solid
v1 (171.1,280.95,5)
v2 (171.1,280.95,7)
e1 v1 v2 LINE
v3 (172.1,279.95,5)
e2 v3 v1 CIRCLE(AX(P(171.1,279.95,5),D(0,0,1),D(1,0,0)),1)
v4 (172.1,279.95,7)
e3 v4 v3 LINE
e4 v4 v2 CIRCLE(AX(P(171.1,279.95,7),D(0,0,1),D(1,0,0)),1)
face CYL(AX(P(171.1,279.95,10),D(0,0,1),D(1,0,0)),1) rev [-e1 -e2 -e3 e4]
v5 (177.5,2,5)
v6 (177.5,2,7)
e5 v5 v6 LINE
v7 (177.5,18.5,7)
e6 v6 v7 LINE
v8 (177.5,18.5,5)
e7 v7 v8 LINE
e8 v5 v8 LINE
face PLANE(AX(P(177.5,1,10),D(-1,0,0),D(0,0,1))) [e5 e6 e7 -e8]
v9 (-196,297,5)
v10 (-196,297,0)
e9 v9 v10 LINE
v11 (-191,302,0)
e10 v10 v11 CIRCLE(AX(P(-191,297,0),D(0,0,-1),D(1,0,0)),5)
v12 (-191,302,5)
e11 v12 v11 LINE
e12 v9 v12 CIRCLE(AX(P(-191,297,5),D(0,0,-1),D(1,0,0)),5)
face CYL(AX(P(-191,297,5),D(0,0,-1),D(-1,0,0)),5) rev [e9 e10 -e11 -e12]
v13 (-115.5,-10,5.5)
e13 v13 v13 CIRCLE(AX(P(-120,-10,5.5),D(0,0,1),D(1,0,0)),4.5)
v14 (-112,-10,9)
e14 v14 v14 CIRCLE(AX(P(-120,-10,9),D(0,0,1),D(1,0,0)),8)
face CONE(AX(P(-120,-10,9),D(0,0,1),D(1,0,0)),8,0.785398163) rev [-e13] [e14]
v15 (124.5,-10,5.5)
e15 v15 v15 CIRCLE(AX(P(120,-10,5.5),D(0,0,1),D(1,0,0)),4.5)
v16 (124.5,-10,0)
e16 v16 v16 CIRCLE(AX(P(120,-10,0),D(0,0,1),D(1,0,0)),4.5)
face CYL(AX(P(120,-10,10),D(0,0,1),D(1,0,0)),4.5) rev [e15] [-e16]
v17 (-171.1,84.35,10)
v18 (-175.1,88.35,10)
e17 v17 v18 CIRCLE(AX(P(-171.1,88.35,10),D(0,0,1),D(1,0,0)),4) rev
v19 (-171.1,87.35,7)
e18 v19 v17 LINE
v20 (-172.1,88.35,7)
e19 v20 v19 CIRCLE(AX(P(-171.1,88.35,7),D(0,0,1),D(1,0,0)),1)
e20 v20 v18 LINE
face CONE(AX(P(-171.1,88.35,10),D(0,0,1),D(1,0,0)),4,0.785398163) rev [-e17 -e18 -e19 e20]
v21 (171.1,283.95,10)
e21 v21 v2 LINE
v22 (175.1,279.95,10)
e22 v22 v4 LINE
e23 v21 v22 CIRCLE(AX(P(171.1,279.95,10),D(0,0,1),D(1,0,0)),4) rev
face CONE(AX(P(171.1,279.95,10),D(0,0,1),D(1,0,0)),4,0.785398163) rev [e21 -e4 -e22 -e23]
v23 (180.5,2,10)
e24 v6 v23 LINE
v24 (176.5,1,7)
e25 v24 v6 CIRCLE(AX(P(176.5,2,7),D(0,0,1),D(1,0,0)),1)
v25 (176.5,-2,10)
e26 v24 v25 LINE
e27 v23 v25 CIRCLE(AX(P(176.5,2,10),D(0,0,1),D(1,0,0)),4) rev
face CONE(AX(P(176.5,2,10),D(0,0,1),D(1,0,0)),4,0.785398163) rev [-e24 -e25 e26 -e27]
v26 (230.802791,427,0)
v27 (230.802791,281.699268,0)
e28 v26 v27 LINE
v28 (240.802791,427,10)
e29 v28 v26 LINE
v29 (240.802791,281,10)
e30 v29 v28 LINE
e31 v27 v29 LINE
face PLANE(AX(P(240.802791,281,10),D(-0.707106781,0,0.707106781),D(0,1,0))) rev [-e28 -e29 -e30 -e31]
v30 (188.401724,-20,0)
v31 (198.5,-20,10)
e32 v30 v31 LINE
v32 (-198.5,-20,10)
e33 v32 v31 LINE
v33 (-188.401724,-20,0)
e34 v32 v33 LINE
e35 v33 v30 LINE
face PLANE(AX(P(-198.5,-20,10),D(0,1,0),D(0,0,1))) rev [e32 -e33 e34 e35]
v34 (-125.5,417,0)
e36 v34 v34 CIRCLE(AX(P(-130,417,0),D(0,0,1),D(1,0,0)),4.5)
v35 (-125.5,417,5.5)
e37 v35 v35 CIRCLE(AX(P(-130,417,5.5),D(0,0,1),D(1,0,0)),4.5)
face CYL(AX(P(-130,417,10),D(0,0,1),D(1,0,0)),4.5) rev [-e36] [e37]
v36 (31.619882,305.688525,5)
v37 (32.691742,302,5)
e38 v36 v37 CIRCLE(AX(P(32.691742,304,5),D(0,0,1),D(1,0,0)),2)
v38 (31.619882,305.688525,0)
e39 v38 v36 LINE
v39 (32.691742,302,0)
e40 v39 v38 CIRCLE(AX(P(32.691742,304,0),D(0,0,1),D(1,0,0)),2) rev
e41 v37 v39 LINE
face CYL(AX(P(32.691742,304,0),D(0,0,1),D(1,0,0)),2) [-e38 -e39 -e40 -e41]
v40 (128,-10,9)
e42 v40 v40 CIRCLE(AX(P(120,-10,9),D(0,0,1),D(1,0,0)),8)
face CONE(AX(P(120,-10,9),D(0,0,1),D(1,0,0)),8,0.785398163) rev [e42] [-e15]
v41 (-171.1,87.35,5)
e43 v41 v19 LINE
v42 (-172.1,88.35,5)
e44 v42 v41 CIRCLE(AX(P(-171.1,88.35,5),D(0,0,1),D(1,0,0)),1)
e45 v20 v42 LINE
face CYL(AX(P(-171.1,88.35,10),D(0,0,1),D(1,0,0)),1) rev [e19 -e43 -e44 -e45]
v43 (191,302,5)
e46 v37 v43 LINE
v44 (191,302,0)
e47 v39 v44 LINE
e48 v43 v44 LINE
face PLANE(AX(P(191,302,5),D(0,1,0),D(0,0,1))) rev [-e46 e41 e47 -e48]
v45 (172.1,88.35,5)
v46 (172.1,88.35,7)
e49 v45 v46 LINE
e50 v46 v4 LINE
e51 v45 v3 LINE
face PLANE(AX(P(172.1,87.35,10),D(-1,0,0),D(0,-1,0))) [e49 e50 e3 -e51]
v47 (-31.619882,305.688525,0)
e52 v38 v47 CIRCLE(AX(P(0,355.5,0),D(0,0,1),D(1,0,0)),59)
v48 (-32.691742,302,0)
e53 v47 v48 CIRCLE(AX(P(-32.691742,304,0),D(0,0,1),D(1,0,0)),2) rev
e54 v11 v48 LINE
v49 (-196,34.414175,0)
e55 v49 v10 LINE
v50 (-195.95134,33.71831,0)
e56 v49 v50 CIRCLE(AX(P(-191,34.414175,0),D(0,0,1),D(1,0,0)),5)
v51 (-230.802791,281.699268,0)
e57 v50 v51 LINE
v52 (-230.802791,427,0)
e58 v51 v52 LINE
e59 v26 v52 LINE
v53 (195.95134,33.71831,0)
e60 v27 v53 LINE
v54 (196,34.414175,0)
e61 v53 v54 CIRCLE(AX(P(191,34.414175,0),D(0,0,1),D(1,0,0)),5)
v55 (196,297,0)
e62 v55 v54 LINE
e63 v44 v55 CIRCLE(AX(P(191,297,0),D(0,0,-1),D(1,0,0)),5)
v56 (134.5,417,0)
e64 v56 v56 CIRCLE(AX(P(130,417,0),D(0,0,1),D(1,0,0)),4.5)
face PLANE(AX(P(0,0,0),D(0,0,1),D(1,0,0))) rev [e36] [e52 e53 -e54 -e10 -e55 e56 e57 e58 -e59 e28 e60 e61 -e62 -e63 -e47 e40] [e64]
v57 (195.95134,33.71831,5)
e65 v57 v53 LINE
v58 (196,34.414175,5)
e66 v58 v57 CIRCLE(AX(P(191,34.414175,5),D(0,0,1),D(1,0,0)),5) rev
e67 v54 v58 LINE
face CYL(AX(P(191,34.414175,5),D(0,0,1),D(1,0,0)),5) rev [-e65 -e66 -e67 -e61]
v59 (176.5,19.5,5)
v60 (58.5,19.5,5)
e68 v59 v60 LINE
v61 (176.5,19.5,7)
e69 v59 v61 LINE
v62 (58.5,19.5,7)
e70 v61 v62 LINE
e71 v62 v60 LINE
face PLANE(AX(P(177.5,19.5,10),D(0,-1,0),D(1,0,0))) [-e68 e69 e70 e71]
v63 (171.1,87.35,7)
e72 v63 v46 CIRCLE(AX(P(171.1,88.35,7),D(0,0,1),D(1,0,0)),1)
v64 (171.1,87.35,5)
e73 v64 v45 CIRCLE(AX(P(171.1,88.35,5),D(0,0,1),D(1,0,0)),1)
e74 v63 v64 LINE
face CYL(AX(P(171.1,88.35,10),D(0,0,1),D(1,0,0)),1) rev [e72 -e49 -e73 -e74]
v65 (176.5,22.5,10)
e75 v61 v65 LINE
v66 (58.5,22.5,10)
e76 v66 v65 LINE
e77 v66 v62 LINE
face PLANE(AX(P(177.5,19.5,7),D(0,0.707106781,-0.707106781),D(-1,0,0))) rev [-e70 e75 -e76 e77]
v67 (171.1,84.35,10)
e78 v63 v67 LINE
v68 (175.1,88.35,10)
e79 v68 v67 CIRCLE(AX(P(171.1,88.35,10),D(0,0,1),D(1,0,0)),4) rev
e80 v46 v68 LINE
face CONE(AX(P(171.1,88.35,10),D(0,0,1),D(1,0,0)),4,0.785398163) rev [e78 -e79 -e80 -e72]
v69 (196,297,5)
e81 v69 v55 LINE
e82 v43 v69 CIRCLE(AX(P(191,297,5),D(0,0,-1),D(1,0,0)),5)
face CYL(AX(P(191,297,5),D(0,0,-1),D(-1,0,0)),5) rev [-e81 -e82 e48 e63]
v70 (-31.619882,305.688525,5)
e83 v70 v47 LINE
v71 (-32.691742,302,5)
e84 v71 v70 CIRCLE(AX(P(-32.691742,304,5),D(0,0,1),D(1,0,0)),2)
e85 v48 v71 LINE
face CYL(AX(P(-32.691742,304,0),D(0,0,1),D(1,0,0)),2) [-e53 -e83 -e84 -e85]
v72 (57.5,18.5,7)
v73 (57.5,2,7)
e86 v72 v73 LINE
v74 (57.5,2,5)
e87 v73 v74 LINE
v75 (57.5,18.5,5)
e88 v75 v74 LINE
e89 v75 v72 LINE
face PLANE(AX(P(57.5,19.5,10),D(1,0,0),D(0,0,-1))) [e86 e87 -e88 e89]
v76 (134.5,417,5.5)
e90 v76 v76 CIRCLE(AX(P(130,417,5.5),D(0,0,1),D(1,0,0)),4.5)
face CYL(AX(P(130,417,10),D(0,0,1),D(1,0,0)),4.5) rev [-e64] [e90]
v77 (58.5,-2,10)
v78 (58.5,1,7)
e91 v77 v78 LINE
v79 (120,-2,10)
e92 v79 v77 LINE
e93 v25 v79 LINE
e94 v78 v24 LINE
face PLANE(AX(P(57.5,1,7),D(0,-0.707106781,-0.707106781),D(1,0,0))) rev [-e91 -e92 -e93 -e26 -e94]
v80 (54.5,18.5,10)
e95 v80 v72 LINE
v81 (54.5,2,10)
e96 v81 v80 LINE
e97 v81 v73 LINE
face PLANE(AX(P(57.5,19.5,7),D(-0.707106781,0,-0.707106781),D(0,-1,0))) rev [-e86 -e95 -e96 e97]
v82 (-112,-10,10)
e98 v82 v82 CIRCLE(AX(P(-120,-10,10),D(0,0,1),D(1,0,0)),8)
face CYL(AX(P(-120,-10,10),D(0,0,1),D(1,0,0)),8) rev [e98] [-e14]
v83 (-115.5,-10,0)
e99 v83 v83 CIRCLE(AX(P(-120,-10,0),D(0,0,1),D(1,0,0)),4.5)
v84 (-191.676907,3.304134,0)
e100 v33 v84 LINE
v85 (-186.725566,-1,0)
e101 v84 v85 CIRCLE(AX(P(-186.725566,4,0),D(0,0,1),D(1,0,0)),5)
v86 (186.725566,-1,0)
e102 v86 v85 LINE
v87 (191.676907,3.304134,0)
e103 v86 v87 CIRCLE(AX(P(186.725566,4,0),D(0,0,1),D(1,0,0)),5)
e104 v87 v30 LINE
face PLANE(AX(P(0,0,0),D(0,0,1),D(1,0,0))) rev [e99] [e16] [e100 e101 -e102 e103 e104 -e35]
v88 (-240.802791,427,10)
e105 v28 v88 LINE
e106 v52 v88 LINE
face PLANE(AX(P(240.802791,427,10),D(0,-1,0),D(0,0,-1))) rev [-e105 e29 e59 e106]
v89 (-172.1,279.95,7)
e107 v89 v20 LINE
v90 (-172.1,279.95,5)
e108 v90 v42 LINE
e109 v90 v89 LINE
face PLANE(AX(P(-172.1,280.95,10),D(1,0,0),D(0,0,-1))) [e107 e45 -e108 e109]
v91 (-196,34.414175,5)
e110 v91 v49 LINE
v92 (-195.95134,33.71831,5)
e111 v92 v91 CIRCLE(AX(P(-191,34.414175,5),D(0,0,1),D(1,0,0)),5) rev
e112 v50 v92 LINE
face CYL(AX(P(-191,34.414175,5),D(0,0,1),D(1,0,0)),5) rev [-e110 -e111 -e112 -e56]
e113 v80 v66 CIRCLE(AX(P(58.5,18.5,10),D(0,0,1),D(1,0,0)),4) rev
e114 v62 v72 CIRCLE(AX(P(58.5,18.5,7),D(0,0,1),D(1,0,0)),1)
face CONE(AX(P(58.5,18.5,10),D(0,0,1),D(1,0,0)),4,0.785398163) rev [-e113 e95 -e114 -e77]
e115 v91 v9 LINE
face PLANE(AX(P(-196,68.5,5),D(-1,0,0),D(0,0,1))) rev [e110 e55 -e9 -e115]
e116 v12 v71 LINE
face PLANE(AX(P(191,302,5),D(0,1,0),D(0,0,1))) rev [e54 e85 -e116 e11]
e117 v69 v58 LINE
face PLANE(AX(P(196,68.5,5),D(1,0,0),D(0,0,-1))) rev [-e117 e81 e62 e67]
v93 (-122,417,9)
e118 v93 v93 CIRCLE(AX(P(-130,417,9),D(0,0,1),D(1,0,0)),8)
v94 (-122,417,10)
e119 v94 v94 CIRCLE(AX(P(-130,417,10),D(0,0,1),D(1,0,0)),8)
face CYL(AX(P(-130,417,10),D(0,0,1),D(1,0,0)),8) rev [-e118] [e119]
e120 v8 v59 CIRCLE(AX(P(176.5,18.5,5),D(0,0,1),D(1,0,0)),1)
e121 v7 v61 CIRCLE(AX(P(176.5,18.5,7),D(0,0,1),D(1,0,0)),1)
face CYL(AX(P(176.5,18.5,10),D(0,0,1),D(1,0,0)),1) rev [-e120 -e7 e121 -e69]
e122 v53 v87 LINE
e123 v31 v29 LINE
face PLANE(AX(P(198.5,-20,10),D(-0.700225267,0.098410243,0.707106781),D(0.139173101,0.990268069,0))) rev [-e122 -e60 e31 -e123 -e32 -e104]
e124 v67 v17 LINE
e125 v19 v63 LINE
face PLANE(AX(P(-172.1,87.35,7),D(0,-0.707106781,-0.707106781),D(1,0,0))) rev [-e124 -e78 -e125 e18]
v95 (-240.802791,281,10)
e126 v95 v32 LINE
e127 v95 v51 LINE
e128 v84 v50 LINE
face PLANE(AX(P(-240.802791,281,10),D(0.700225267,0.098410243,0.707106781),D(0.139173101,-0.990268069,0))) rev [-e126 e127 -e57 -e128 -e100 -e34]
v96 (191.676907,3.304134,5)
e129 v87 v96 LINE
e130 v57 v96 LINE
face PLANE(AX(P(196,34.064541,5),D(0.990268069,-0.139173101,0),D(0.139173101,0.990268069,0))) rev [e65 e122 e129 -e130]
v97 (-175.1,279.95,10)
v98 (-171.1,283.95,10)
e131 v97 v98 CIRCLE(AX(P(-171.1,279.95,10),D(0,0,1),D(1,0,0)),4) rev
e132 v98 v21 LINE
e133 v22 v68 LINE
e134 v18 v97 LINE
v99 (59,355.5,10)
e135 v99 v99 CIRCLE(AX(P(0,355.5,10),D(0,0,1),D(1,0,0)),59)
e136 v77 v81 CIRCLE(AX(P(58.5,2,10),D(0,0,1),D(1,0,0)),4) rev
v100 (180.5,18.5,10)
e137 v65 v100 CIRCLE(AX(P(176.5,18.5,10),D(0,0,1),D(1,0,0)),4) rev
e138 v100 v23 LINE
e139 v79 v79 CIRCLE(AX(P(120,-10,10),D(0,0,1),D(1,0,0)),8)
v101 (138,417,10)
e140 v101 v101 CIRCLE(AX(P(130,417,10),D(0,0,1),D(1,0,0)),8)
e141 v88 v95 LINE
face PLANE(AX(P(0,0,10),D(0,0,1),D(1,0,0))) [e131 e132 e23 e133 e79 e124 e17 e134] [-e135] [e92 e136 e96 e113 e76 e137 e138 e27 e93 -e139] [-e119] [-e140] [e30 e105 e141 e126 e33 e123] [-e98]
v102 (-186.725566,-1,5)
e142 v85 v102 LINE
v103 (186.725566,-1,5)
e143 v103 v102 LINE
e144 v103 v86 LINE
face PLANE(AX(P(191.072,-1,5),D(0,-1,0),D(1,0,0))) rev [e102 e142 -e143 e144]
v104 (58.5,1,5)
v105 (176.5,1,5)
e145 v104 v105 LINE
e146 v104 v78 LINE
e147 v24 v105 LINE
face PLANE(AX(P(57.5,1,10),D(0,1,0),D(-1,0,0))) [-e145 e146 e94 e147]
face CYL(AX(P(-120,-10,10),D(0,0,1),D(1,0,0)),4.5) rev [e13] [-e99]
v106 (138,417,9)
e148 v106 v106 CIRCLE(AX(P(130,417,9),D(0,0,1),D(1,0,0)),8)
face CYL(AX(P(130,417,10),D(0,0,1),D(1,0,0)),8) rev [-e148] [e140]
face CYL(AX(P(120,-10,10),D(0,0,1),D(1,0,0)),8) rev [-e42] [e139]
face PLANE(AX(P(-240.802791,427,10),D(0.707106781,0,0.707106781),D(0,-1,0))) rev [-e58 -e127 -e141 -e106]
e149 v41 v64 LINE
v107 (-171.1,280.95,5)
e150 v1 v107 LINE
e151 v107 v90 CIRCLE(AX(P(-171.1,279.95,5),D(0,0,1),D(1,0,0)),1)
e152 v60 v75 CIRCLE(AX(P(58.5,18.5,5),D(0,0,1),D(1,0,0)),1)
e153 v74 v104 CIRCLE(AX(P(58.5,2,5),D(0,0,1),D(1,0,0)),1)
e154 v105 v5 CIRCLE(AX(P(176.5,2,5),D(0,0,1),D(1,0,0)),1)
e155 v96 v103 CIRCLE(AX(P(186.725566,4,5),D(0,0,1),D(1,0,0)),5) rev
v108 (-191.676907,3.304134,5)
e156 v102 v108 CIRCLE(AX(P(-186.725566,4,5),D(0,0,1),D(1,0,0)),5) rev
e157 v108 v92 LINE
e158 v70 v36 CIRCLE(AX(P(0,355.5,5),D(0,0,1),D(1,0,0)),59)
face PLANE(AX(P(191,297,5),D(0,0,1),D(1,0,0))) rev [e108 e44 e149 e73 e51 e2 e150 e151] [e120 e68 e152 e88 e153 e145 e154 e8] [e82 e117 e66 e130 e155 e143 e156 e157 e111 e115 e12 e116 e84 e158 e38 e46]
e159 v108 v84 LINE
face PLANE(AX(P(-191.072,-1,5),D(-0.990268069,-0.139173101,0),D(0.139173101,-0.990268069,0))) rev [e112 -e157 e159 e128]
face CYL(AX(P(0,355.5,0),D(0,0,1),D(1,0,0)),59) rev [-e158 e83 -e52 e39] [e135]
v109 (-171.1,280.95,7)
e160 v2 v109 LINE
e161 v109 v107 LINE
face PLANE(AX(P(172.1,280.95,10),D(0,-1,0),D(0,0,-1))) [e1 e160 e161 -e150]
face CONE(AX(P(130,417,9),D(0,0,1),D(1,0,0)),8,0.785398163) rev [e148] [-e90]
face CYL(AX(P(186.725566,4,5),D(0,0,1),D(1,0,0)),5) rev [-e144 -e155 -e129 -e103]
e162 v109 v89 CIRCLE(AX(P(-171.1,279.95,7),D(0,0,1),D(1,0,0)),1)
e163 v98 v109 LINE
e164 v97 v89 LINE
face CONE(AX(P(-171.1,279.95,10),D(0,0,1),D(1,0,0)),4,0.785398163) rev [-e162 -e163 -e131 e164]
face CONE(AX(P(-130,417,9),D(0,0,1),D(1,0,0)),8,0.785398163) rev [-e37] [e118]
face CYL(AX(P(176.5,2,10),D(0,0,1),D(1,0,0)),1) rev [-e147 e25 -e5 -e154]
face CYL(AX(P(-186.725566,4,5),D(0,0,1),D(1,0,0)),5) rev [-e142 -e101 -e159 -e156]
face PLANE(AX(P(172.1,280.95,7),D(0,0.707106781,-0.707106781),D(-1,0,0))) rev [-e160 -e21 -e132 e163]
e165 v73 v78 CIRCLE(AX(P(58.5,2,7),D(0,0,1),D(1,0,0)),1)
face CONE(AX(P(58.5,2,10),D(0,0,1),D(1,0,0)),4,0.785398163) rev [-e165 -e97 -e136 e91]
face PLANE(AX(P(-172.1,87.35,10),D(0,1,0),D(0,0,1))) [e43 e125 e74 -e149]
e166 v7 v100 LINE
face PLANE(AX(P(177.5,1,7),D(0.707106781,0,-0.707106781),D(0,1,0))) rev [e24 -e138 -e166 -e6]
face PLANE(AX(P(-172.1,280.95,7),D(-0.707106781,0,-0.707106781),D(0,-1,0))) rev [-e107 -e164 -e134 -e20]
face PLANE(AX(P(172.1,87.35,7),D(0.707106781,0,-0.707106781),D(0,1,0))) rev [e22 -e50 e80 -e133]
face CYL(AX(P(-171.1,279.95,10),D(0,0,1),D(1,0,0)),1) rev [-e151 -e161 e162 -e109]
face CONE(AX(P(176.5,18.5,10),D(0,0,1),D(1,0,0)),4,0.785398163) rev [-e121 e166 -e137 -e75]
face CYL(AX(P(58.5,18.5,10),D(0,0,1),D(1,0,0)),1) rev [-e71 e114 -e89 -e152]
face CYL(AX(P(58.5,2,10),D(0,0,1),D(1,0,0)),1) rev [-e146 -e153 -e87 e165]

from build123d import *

# Parameters (mm, degrees)
SKETCH1_R                                    = 40
SKETCH1_W                                    = 120
SKETCH1_H                                    = 18.5
SKETCH1_W_2                                  = 344.2
SKETCH1_H_2                                  = 193.6
BOSS_EXTRUDE1_DEPTH                          = 5
CUT_EXTRUDE1_DEPTH                           = 5
SKETCH3_R                                    = 59
CUT_EXTRUDE2_DEPTH                           = 491.321307177
FILLET1_R                                    = 1
FILLET2_R                                    = 2
CHAMFER1_SIZE                                = 3
CHAMFER2_SIZE                                = 10
CSK_FOR_M8_HEX_SOCKET_COUNTERSUNK_HE_2_COUNT = 2
CSK_FOR_M8_HEX_SOCKET_COUNTERSUNK_HE_2_PITCH = 260
CSK_FOR_M8_HEX_SOCKET_COUNTERSUNK_HE_3_COUNT = 2
CSK_FOR_M8_HEX_SOCKET_COUNTERSUNK_HE_3_PITCH = 494.801980594
CSK_FOR_M8_HEX_SOCKET_COUNTERSUNK_HE_4_COUNT = 2
CSK_FOR_M8_HEX_SOCKET_COUNTERSUNK_HE_4_PITCH = 427.117079968
FILLET3_R                                    = 5


with BuildPart() as part:
    # Sketch1 → Boss-Extrude1 (new, symmetric)
    with BuildSketch(Plane.XY.offset(5)):
        Polygon((-198.5, -20), (198.5, -20), (240.802791245, 281), (240.802791245, 427), (-240.802791245, 427), (-240.802791245, 281), align=None)
        with Locations((0, 355.5)):
            Circle(SKETCH1_R, mode=Mode.SUBTRACT)
        with Locations((117.5, 10.25)):
            Rectangle(SKETCH1_W, SKETCH1_H, mode=Mode.SUBTRACT)
        with Locations((0, 184.15)):
            Rectangle(SKETCH1_W_2, SKETCH1_H_2, mode=Mode.SUBTRACT)
    extrude(amount=BOSS_EXTRUDE1_DEPTH, both=True)

    # Sketch2 → Cut-Extrude1 (cut)
    with BuildSketch(Plane(origin=(0, 0, 0), x_dir=(-1, 0, 0), z_dir=(0, 0, -1))):
        with BuildLine():
            Line((196, 34.064541037), (196, 68.5))
            Line((196, 68.5), (196, 297))
            ThreePointArc((196, 297), (194.535533906, 300.535533906), (191, 302))
            Line((191, 302), (-191, 302))
            ThreePointArc((-191, 302), (-194.535533906, 300.535533906), (-196, 297))
            Line((-196, 297), (-196, 68.5))
            Line((-196, 68.5), (-196, 34.064541037))
            Line((-196, 34.064541037), (-191.072000134, -1))
            Line((-191.072000134, -1), (191.072000134, -1))
            Line((191.072000134, -1), (196, 34.064541037))
        make_face()
    extrude(amount=-CUT_EXTRUDE1_DEPTH, mode=Mode.SUBTRACT)

    # Sketch3 → Cut-Extrude2 (cut, through all)
    with BuildSketch(Plane.XY.offset(10)):
        with Locations((0, 355.5)):
            Circle(SKETCH3_R)
    extrude(amount=-CUT_EXTRUDE2_DEPTH, mode=Mode.SUBTRACT)

    # Fillet1
    fillet1_edges = [part.edges().sort_by_distance(p)[0] for p in [
        (177.5, 1, 7.5),
        (177.5, 19.5, 7.5),
        (57.5, 19.5, 7.5),
        (57.5, 1, 7.5),
        (-172.1, 280.95, 7.5),
        (-172.1, 87.35, 7.5),
        (172.1, 87.35, 7.5),
        (172.1, 280.95, 7.5),
    ]]
    fillet(fillet1_edges, radius=FILLET1_R)

    # Fillet2
    fillet2_edges = [part.edges().sort_by_distance(p)[0] for p in [
        (-24.874685928, 302, 2.5),
        (24.874685928, 302, 2.5),
    ]]
    fillet(fillet2_edges, radius=FILLET2_R)

    # Chamfer1
    chamfer1_edges = [part.edges().sort_by_distance(p)[0] for p in [
        (57.5, 10.25, 10),
        (117.5, 1, 10),
        (117.5, 19.5, 10),
        (177.5, 10.25, 10),
        (0, 87.35, 10),
        (172.1, 184.15, 10),
        (0, 280.95, 10),
        (-172.1, 184.15, 10),
        (57.792893219, 1.292893219, 10),
        (57.792893219, 19.207106781, 10),
        (177.207106781, 19.207106781, 10),
        (177.207106781, 1.292893219, 10),
        (171.807106781, 87.642893219, 10),
        (171.807106781, 280.657106781, 10),
        (-171.807106781, 280.657106781, 10),
        (-171.807106781, 87.642893219, 10),
    ]]
    chamfer(chamfer1_edges, length=CHAMFER1_SIZE)

    # Chamfer2
    chamfer2_edges = [part.edges().sort_by_distance(p)[0] for p in [
        (219.651395623, 130.5, 0),
        (240.802791245, 354, 0),
        (-219.651395623, 130.5, 0),
        (-240.802791245, 354, 0),
    ]]
    chamfer(chamfer2_edges, length=CHAMFER2_SIZE - 0.0001)  # a hair under: the kernel refuses the full size

    # Sketch5 → CSK for M8 Hex Socket Countersunk Head Screw1 (revolve, cut)
    with BuildSketch(Plane(origin=(-130, 417, 10), x_dir=(0, -1, 0), z_dir=(1, 0, 0))):
        Polygon((0, 0), (0, 10), (4.5, 10), (4.5, 4.5), (8, 1), (8, 0), align=None)
    csk_for_m8_hex_socket_countersunk_head_s = revolve(axis=Axis((-130, 417, 16.35), (0, 0, -1)), mode=Mode.SUBTRACT)

    # CSK for M8 Hex Socket Countersunk He 2: CSK for M8 Hex Socket Countersunk Head Screw1 ×2
    with Locations(*[(i * CSK_FOR_M8_HEX_SOCKET_COUNTERSUNK_HE_2_PITCH, 0, 0) for i in range(1, CSK_FOR_M8_HEX_SOCKET_COUNTERSUNK_HE_2_COUNT)]):
        add(csk_for_m8_hex_socket_countersunk_head_s, mode=Mode.SUBTRACT)

    # CSK for M8 Hex Socket Countersunk He 3: CSK for M8 Hex Socket Countersunk Head Screw1 ×2
    with Locations(*[Vector(0.5052526259085499, -0.8629714850518034, 0) * (i * CSK_FOR_M8_HEX_SOCKET_COUNTERSUNK_HE_3_PITCH) for i in range(1, CSK_FOR_M8_HEX_SOCKET_COUNTERSUNK_HE_3_COUNT)]):
        add(csk_for_m8_hex_socket_countersunk_head_s, mode=Mode.SUBTRACT)

    # CSK for M8 Hex Socket Countersunk He 4: CSK for M8 Hex Socket Countersunk Head Screw1 ×2
    with Locations(*[Vector(0.02341278414986336, -0.9997258831991657, 0) * (i * CSK_FOR_M8_HEX_SOCKET_COUNTERSUNK_HE_4_PITCH) for i in range(1, CSK_FOR_M8_HEX_SOCKET_COUNTERSUNK_HE_4_COUNT)]):
        add(csk_for_m8_hex_socket_countersunk_head_s, mode=Mode.SUBTRACT)

    # Fillet3
    fillet3_edges = [part.edges().sort_by_distance(p)[0] for p in [
        (-196, 34.064541037, 2.5),
        (-191.072000134, -1, 2.5),
        (191.072000134, -1, 2.5),
        (196, 34.064541037, 2.5),
    ]]
    fillet(fillet3_edges, radius=FILLET3_R)


solid = part.part
